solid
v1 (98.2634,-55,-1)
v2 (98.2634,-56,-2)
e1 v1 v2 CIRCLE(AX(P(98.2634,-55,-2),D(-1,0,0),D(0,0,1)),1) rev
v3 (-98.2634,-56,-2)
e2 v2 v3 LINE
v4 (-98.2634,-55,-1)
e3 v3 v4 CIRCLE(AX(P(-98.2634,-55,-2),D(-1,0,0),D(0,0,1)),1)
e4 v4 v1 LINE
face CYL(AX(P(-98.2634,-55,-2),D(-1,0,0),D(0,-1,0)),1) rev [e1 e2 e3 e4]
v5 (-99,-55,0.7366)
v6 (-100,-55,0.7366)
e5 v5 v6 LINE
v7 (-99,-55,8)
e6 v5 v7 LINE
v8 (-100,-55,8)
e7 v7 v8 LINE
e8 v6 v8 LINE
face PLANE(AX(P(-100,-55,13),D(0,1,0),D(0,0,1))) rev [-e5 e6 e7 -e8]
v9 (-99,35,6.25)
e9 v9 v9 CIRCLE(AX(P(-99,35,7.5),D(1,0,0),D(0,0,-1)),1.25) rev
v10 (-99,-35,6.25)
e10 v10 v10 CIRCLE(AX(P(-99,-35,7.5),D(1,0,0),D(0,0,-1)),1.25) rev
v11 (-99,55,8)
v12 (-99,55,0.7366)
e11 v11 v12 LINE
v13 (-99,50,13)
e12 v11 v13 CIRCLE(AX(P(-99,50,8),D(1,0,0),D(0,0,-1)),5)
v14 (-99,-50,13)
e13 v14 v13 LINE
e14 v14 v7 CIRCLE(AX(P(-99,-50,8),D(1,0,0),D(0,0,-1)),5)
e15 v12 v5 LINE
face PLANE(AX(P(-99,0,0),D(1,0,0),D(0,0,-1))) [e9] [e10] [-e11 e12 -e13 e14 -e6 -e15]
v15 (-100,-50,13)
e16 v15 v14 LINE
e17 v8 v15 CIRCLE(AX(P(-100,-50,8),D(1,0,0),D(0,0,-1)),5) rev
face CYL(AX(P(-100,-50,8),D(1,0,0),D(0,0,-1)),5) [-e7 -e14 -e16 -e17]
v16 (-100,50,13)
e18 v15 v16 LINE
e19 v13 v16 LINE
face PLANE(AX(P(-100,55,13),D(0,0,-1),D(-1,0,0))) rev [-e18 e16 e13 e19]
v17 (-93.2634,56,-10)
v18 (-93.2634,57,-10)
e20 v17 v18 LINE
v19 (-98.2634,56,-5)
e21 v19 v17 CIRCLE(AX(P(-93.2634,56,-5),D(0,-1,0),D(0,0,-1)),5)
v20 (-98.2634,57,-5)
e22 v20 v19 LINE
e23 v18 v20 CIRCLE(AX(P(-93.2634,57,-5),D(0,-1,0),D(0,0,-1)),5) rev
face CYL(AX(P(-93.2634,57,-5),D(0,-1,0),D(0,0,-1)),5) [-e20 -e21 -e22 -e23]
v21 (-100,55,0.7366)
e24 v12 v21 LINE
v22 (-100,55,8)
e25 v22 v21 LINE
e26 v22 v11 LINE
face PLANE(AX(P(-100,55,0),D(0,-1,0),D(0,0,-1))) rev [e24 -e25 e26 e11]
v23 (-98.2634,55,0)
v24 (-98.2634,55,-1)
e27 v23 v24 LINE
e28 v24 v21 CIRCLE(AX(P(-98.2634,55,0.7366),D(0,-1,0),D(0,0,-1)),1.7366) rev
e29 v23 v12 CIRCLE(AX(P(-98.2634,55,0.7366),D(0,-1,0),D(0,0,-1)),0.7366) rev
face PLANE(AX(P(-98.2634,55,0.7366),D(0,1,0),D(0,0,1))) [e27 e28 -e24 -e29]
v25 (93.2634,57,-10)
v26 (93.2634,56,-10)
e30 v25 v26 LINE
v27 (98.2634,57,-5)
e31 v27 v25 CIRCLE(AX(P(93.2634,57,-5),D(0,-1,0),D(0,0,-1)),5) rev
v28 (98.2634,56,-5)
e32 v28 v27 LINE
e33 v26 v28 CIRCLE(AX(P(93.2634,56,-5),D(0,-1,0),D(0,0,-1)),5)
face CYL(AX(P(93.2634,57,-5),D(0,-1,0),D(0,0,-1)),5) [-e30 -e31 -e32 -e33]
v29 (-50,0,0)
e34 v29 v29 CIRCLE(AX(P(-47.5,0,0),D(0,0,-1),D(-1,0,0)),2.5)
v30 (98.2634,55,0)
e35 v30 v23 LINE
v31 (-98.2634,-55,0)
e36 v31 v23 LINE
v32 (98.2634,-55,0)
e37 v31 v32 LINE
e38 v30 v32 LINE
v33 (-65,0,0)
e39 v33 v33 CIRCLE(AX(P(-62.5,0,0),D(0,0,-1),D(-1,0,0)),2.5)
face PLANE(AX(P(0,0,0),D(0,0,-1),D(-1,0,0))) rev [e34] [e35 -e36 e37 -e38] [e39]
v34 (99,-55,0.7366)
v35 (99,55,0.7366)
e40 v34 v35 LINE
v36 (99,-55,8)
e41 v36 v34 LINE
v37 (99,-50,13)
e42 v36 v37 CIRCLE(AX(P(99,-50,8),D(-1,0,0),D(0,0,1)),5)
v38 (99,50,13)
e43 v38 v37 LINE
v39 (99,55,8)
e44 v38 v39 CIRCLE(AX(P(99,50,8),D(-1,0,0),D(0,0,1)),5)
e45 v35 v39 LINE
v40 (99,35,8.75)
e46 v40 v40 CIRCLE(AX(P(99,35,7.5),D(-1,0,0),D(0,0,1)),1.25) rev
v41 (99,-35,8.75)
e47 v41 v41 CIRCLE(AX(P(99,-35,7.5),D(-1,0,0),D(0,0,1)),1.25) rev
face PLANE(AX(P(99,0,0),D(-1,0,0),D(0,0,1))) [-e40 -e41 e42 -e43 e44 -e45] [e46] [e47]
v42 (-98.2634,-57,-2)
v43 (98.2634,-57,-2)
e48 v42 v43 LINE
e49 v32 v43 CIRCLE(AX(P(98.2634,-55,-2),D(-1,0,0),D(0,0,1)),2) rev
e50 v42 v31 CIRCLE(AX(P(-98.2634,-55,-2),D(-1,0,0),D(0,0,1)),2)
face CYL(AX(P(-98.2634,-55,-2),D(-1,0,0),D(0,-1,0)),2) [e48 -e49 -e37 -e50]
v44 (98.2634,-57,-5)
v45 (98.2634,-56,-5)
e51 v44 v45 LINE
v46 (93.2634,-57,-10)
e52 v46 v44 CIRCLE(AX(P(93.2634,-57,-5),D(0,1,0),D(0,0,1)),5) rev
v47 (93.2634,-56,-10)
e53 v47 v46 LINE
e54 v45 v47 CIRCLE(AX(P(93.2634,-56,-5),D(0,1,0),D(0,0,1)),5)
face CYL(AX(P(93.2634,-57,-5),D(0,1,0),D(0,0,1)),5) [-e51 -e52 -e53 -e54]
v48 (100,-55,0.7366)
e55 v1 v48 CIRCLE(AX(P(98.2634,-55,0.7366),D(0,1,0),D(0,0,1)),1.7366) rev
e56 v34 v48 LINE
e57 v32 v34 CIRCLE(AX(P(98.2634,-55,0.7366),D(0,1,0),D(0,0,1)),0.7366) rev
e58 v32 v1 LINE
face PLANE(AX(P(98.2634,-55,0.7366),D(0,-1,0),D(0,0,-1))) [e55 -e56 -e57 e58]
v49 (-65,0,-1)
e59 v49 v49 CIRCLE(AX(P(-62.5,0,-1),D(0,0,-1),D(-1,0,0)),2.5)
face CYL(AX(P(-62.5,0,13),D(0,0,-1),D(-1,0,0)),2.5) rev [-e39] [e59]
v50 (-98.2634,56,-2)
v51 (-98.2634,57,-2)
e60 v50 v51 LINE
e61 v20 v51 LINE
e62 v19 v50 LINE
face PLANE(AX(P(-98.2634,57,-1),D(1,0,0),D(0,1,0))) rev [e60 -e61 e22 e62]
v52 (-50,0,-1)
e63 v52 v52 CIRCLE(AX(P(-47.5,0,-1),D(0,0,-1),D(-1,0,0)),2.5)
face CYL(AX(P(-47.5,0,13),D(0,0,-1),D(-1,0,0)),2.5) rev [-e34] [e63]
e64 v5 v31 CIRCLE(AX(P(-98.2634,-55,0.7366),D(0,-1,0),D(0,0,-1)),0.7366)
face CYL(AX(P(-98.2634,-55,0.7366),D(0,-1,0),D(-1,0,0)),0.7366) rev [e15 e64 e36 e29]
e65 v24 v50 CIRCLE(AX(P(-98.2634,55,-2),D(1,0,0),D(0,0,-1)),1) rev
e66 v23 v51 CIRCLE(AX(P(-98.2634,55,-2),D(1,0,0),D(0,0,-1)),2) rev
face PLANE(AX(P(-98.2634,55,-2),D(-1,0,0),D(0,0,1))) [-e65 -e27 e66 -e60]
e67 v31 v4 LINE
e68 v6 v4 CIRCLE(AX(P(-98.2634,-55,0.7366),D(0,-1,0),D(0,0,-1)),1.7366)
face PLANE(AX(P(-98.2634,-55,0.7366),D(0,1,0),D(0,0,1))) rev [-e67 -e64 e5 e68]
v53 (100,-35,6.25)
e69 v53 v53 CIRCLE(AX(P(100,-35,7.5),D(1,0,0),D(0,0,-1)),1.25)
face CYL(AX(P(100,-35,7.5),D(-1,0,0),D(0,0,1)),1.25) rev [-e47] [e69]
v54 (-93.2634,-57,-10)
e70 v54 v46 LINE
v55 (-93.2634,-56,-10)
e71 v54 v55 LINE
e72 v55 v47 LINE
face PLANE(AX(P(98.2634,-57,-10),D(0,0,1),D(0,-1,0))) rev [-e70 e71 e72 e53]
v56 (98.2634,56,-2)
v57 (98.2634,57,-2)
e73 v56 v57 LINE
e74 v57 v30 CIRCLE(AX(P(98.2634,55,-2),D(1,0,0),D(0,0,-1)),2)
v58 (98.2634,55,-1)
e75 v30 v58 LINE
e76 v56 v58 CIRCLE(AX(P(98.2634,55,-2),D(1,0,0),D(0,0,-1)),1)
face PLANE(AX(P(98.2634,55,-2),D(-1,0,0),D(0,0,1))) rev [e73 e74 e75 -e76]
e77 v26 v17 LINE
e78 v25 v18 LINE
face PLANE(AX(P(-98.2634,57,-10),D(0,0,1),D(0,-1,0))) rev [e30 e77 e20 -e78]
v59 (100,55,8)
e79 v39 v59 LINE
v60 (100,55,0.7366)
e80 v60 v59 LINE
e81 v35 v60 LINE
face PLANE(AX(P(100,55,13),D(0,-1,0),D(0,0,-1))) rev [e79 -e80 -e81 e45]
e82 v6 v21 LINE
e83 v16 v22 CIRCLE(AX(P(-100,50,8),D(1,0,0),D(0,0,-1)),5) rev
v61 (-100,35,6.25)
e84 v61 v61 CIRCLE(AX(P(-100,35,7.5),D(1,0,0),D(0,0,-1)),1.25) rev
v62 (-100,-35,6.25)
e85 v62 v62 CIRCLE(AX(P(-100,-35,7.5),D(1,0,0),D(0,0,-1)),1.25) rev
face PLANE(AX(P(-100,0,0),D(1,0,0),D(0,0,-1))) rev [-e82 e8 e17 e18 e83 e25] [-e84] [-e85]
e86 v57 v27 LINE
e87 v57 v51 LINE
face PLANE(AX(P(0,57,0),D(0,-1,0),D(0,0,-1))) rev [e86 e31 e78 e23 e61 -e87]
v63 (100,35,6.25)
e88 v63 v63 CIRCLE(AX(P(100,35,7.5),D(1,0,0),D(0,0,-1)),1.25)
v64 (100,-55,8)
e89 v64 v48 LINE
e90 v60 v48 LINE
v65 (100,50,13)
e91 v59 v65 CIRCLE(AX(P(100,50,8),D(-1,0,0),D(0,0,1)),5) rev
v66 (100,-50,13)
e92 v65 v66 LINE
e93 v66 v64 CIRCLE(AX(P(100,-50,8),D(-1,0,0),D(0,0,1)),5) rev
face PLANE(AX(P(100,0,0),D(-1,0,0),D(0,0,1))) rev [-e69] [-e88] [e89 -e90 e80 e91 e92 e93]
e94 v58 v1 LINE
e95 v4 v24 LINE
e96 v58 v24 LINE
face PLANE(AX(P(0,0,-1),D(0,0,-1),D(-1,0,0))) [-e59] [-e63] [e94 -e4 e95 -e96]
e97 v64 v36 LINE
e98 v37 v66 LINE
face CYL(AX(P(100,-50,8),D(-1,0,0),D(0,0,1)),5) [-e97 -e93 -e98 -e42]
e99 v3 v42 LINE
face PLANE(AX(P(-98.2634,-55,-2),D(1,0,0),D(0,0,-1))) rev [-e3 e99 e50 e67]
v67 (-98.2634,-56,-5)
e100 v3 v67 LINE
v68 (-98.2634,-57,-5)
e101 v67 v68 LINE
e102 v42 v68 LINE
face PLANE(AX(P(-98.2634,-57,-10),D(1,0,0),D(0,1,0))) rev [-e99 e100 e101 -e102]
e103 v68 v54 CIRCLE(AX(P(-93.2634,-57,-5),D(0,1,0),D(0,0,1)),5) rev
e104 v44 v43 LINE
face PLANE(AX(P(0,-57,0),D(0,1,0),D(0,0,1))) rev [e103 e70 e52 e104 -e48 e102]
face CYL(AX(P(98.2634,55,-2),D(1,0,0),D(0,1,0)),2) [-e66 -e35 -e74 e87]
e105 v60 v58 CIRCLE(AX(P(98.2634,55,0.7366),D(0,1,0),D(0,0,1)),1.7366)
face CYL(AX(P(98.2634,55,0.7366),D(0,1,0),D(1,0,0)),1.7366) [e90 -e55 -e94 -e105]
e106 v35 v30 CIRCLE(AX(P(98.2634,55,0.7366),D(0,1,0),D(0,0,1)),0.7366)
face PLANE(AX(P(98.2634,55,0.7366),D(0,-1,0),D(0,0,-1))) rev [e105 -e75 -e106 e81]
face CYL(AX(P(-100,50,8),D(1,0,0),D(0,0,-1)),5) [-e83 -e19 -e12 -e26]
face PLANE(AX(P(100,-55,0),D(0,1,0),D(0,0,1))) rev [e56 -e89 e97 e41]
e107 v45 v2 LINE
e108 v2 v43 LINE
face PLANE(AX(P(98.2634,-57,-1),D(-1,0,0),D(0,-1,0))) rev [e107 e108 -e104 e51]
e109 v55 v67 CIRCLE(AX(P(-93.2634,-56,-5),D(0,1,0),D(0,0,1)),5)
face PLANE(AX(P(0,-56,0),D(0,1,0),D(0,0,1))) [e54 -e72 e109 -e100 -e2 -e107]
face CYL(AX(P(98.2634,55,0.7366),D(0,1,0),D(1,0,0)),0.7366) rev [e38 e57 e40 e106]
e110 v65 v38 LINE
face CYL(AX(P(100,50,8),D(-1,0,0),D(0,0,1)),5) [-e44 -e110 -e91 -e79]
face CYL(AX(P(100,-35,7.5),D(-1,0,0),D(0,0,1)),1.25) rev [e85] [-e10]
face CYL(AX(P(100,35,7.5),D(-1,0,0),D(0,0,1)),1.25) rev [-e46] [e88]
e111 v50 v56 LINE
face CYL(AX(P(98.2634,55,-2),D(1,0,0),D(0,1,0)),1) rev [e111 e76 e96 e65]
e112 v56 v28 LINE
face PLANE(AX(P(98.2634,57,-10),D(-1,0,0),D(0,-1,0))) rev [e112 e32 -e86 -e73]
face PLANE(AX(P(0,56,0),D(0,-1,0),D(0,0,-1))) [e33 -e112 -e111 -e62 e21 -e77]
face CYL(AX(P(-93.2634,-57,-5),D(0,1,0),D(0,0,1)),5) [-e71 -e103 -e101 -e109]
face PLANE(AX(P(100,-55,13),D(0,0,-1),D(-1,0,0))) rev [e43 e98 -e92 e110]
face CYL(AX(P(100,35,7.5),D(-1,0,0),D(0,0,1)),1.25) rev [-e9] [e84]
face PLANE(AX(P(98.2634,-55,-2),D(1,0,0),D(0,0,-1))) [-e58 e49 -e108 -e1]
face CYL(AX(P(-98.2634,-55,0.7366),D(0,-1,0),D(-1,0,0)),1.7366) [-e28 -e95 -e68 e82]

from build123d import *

# Parameters (mm, degrees)
SKETCH1_W                    = 200
SKETCH1_H                    = 110
BASE_FLANGE1_DEPTH           = 1
EDGE_FLANGE1_STRIP_W         = 5.4732
EDGE_FLANGE1_STRIP_H         = 1
EDGE_FLANGE1_STRIP_CUT_DEPTH = 110
EDGE_FLANGE1_DEPTH           = 110
EDGE_FLANGE2_STRIP_W         = 5.4732
EDGE_FLANGE2_STRIP_H         = 1
EDGE_FLANGE2_STRIP_CUT_DEPTH = 110
EDGE_FLANGE2_DEPTH           = 110
CUT_EXTRUDE1_DEPTH           = 207.869524097
CUT_EXTRUDE1_DEPTH_BACK      = 10
SKETCH14_R                   = 1.25
EDGE_FLANGE3_DEPTH           = 196.5268
EDGE_FLANGE3_BEND_DEPTH      = 196.5268
FILLET1_R                    = 5
SKETCH20_R                   = 2.5
CUT_EXTRUDE2_DEPTH           = 116.952576513


# Sheet-metal steps are written as plain solids
with BuildPart() as part:
    # Sketch1 → Base-Flange1 (new body)
    with BuildSketch(Plane.XY):
        Rectangle(SKETCH1_W, SKETCH1_H)
    extrude(amount=-BASE_FLANGE1_DEPTH)

    # Edge-Flange1 strip (across the edge) → Edge-Flange1 strip cut (cut)
    with BuildSketch(Plane(origin=(-100, 55, 0), x_dir=(1, 0, 0), z_dir=(0, -1, 0))):
        with Locations((-1, -0.5)):
            Rectangle(EDGE_FLANGE1_STRIP_W, EDGE_FLANGE1_STRIP_H)
    extrude(amount=EDGE_FLANGE1_STRIP_CUT_DEPTH, mode=Mode.SUBTRACT)

    # Edge-Flange1 section (across the edge) → Edge-Flange1 (add)
    with BuildSketch(Plane(origin=(-100, 55, 0), x_dir=(1, 0, 0), z_dir=(0, -1, 0))):
        with BuildLine():
            Line((0, 0.7366), (0, 13))
            Line((0, 13), (1, 13))
            Line((1, 13), (1, 0.7366))
            ThreePointArc((1, 0.7366), (1.215745145, 0.215745145), (1.7366, 0))
            Line((1.7366, 0), (1.7366, -1))
            ThreePointArc((1.7366, -1), (0.508638364, -0.491361636), (0, 0.7366))
        make_face()
    extrude(amount=EDGE_FLANGE1_DEPTH)

    # Edge-Flange2 strip (across the edge) → Edge-Flange2 strip cut (cut)
    with BuildSketch(Plane(origin=(100, -55, 0), x_dir=(-1, 0, 0), z_dir=(0, 1, 0))):
        with Locations((-1, -0.5)):
            Rectangle(EDGE_FLANGE2_STRIP_W, EDGE_FLANGE2_STRIP_H)
    extrude(amount=EDGE_FLANGE2_STRIP_CUT_DEPTH, mode=Mode.SUBTRACT)

    # Edge-Flange2 section (across the edge) → Edge-Flange2 (add)
    with BuildSketch(Plane(origin=(100, -55, 0), x_dir=(-1, 0, 0), z_dir=(0, 1, 0))):
        with BuildLine():
            Line((0, 0.7366), (0, 13))
            Line((0, 13), (1, 13))
            Line((1, 13), (1, 0.7366))
            ThreePointArc((1, 0.7366), (1.215745145, 0.215745145), (1.7366, 0))
            Line((1.7366, 0), (1.7366, -1))
            ThreePointArc((1.7366, -1), (0.508638364, -0.491361636), (0, 0.7366))
        make_face()
    extrude(amount=EDGE_FLANGE2_DEPTH)

    # Sketch14 → Cut-Extrude1 (cut, two sides: drawn at the far end of the back side and taken through both)
    with BuildSketch(Plane(origin=(-99, 0, 0), x_dir=(0, 0, -1), z_dir=(1, 0, 0)).offset(-CUT_EXTRUDE1_DEPTH_BACK)):
        with Locations(Location((-7.5, -35, 0), (0, 0, 180))):
            Circle(SKETCH14_R)
        with Locations(Location((-7.5, 35, 0), (0, 0, 180))):
            Circle(SKETCH14_R)
    extrude(amount=CUT_EXTRUDE1_DEPTH + CUT_EXTRUDE1_DEPTH_BACK, mode=Mode.SUBTRACT)

    # Edge-Flange3 section (across the edge) → Edge-Flange3 (add)
    with BuildSketch(Plane(origin=(98.2634, -56, -1), x_dir=(0, 1, 0), z_dir=(-1, 0, 0))):
        with BuildLine():
            Line((-1, 1), (-1, 9))
            Line((-1, 9), (0, 9))
            Line((0, 9), (0, 1))
            ThreePointArc((0, 1), (0.292893219, 0.292893219), (1, 0))
            Line((1, 0), (1, -1))
            ThreePointArc((1, -1), (-0.414213562, -0.414213562), (-1, 1))
        make_face()
    extrude(amount=EDGE_FLANGE3_DEPTH)

    # Edge-Flange3 section 2 (across the edge) → Edge-Flange3 bend (add)
    with BuildSketch(Plane(origin=(-98.2634, 56, -1), x_dir=(0, -1, 0), z_dir=(1, 0, 0))):
        with BuildLine():
            Line((-1, 1), (-1, 9))
            Line((-1, 9), (0, 9))
            Line((0, 9), (0, 1))
            ThreePointArc((0, 1), (0.292893219, 0.292893219), (1, 0))
            Line((1, 0), (1, -1))
            ThreePointArc((1, -1), (-0.414213562, -0.414213562), (-1, 1))
        make_face()
    extrude(amount=EDGE_FLANGE3_BEND_DEPTH)

    # Fillet1
    fillet1_edges = [part.edges().sort_by_distance(p)[0] for p in [
        (98.2634, -56.5, -10),
        (-98.2634, -56.5, -10),
        (-98.2634, 56.5, -10),
        (98.2634, 56.5, -10),
        (-99.5, 55, 13),
        (-99.5, -55, 13),
        (99.5, -55, 13),
        (99.5, 55, 13),
    ]]
    fillet(fillet1_edges, radius=FILLET1_R)

    # Sketch20 → Cut-Extrude2 (cut, through all)
    with BuildSketch(Plane(origin=(0, 0, -1), x_dir=(-1, 0, 0), z_dir=(0, 0, -1))):
        with Locations((47.5, 0)):
            Circle(SKETCH20_R)
        with Locations((62.5, 0)):
            Circle(SKETCH20_R)
    extrude(amount=-CUT_EXTRUDE2_DEPTH, mode=Mode.SUBTRACT)


solid = part.part
